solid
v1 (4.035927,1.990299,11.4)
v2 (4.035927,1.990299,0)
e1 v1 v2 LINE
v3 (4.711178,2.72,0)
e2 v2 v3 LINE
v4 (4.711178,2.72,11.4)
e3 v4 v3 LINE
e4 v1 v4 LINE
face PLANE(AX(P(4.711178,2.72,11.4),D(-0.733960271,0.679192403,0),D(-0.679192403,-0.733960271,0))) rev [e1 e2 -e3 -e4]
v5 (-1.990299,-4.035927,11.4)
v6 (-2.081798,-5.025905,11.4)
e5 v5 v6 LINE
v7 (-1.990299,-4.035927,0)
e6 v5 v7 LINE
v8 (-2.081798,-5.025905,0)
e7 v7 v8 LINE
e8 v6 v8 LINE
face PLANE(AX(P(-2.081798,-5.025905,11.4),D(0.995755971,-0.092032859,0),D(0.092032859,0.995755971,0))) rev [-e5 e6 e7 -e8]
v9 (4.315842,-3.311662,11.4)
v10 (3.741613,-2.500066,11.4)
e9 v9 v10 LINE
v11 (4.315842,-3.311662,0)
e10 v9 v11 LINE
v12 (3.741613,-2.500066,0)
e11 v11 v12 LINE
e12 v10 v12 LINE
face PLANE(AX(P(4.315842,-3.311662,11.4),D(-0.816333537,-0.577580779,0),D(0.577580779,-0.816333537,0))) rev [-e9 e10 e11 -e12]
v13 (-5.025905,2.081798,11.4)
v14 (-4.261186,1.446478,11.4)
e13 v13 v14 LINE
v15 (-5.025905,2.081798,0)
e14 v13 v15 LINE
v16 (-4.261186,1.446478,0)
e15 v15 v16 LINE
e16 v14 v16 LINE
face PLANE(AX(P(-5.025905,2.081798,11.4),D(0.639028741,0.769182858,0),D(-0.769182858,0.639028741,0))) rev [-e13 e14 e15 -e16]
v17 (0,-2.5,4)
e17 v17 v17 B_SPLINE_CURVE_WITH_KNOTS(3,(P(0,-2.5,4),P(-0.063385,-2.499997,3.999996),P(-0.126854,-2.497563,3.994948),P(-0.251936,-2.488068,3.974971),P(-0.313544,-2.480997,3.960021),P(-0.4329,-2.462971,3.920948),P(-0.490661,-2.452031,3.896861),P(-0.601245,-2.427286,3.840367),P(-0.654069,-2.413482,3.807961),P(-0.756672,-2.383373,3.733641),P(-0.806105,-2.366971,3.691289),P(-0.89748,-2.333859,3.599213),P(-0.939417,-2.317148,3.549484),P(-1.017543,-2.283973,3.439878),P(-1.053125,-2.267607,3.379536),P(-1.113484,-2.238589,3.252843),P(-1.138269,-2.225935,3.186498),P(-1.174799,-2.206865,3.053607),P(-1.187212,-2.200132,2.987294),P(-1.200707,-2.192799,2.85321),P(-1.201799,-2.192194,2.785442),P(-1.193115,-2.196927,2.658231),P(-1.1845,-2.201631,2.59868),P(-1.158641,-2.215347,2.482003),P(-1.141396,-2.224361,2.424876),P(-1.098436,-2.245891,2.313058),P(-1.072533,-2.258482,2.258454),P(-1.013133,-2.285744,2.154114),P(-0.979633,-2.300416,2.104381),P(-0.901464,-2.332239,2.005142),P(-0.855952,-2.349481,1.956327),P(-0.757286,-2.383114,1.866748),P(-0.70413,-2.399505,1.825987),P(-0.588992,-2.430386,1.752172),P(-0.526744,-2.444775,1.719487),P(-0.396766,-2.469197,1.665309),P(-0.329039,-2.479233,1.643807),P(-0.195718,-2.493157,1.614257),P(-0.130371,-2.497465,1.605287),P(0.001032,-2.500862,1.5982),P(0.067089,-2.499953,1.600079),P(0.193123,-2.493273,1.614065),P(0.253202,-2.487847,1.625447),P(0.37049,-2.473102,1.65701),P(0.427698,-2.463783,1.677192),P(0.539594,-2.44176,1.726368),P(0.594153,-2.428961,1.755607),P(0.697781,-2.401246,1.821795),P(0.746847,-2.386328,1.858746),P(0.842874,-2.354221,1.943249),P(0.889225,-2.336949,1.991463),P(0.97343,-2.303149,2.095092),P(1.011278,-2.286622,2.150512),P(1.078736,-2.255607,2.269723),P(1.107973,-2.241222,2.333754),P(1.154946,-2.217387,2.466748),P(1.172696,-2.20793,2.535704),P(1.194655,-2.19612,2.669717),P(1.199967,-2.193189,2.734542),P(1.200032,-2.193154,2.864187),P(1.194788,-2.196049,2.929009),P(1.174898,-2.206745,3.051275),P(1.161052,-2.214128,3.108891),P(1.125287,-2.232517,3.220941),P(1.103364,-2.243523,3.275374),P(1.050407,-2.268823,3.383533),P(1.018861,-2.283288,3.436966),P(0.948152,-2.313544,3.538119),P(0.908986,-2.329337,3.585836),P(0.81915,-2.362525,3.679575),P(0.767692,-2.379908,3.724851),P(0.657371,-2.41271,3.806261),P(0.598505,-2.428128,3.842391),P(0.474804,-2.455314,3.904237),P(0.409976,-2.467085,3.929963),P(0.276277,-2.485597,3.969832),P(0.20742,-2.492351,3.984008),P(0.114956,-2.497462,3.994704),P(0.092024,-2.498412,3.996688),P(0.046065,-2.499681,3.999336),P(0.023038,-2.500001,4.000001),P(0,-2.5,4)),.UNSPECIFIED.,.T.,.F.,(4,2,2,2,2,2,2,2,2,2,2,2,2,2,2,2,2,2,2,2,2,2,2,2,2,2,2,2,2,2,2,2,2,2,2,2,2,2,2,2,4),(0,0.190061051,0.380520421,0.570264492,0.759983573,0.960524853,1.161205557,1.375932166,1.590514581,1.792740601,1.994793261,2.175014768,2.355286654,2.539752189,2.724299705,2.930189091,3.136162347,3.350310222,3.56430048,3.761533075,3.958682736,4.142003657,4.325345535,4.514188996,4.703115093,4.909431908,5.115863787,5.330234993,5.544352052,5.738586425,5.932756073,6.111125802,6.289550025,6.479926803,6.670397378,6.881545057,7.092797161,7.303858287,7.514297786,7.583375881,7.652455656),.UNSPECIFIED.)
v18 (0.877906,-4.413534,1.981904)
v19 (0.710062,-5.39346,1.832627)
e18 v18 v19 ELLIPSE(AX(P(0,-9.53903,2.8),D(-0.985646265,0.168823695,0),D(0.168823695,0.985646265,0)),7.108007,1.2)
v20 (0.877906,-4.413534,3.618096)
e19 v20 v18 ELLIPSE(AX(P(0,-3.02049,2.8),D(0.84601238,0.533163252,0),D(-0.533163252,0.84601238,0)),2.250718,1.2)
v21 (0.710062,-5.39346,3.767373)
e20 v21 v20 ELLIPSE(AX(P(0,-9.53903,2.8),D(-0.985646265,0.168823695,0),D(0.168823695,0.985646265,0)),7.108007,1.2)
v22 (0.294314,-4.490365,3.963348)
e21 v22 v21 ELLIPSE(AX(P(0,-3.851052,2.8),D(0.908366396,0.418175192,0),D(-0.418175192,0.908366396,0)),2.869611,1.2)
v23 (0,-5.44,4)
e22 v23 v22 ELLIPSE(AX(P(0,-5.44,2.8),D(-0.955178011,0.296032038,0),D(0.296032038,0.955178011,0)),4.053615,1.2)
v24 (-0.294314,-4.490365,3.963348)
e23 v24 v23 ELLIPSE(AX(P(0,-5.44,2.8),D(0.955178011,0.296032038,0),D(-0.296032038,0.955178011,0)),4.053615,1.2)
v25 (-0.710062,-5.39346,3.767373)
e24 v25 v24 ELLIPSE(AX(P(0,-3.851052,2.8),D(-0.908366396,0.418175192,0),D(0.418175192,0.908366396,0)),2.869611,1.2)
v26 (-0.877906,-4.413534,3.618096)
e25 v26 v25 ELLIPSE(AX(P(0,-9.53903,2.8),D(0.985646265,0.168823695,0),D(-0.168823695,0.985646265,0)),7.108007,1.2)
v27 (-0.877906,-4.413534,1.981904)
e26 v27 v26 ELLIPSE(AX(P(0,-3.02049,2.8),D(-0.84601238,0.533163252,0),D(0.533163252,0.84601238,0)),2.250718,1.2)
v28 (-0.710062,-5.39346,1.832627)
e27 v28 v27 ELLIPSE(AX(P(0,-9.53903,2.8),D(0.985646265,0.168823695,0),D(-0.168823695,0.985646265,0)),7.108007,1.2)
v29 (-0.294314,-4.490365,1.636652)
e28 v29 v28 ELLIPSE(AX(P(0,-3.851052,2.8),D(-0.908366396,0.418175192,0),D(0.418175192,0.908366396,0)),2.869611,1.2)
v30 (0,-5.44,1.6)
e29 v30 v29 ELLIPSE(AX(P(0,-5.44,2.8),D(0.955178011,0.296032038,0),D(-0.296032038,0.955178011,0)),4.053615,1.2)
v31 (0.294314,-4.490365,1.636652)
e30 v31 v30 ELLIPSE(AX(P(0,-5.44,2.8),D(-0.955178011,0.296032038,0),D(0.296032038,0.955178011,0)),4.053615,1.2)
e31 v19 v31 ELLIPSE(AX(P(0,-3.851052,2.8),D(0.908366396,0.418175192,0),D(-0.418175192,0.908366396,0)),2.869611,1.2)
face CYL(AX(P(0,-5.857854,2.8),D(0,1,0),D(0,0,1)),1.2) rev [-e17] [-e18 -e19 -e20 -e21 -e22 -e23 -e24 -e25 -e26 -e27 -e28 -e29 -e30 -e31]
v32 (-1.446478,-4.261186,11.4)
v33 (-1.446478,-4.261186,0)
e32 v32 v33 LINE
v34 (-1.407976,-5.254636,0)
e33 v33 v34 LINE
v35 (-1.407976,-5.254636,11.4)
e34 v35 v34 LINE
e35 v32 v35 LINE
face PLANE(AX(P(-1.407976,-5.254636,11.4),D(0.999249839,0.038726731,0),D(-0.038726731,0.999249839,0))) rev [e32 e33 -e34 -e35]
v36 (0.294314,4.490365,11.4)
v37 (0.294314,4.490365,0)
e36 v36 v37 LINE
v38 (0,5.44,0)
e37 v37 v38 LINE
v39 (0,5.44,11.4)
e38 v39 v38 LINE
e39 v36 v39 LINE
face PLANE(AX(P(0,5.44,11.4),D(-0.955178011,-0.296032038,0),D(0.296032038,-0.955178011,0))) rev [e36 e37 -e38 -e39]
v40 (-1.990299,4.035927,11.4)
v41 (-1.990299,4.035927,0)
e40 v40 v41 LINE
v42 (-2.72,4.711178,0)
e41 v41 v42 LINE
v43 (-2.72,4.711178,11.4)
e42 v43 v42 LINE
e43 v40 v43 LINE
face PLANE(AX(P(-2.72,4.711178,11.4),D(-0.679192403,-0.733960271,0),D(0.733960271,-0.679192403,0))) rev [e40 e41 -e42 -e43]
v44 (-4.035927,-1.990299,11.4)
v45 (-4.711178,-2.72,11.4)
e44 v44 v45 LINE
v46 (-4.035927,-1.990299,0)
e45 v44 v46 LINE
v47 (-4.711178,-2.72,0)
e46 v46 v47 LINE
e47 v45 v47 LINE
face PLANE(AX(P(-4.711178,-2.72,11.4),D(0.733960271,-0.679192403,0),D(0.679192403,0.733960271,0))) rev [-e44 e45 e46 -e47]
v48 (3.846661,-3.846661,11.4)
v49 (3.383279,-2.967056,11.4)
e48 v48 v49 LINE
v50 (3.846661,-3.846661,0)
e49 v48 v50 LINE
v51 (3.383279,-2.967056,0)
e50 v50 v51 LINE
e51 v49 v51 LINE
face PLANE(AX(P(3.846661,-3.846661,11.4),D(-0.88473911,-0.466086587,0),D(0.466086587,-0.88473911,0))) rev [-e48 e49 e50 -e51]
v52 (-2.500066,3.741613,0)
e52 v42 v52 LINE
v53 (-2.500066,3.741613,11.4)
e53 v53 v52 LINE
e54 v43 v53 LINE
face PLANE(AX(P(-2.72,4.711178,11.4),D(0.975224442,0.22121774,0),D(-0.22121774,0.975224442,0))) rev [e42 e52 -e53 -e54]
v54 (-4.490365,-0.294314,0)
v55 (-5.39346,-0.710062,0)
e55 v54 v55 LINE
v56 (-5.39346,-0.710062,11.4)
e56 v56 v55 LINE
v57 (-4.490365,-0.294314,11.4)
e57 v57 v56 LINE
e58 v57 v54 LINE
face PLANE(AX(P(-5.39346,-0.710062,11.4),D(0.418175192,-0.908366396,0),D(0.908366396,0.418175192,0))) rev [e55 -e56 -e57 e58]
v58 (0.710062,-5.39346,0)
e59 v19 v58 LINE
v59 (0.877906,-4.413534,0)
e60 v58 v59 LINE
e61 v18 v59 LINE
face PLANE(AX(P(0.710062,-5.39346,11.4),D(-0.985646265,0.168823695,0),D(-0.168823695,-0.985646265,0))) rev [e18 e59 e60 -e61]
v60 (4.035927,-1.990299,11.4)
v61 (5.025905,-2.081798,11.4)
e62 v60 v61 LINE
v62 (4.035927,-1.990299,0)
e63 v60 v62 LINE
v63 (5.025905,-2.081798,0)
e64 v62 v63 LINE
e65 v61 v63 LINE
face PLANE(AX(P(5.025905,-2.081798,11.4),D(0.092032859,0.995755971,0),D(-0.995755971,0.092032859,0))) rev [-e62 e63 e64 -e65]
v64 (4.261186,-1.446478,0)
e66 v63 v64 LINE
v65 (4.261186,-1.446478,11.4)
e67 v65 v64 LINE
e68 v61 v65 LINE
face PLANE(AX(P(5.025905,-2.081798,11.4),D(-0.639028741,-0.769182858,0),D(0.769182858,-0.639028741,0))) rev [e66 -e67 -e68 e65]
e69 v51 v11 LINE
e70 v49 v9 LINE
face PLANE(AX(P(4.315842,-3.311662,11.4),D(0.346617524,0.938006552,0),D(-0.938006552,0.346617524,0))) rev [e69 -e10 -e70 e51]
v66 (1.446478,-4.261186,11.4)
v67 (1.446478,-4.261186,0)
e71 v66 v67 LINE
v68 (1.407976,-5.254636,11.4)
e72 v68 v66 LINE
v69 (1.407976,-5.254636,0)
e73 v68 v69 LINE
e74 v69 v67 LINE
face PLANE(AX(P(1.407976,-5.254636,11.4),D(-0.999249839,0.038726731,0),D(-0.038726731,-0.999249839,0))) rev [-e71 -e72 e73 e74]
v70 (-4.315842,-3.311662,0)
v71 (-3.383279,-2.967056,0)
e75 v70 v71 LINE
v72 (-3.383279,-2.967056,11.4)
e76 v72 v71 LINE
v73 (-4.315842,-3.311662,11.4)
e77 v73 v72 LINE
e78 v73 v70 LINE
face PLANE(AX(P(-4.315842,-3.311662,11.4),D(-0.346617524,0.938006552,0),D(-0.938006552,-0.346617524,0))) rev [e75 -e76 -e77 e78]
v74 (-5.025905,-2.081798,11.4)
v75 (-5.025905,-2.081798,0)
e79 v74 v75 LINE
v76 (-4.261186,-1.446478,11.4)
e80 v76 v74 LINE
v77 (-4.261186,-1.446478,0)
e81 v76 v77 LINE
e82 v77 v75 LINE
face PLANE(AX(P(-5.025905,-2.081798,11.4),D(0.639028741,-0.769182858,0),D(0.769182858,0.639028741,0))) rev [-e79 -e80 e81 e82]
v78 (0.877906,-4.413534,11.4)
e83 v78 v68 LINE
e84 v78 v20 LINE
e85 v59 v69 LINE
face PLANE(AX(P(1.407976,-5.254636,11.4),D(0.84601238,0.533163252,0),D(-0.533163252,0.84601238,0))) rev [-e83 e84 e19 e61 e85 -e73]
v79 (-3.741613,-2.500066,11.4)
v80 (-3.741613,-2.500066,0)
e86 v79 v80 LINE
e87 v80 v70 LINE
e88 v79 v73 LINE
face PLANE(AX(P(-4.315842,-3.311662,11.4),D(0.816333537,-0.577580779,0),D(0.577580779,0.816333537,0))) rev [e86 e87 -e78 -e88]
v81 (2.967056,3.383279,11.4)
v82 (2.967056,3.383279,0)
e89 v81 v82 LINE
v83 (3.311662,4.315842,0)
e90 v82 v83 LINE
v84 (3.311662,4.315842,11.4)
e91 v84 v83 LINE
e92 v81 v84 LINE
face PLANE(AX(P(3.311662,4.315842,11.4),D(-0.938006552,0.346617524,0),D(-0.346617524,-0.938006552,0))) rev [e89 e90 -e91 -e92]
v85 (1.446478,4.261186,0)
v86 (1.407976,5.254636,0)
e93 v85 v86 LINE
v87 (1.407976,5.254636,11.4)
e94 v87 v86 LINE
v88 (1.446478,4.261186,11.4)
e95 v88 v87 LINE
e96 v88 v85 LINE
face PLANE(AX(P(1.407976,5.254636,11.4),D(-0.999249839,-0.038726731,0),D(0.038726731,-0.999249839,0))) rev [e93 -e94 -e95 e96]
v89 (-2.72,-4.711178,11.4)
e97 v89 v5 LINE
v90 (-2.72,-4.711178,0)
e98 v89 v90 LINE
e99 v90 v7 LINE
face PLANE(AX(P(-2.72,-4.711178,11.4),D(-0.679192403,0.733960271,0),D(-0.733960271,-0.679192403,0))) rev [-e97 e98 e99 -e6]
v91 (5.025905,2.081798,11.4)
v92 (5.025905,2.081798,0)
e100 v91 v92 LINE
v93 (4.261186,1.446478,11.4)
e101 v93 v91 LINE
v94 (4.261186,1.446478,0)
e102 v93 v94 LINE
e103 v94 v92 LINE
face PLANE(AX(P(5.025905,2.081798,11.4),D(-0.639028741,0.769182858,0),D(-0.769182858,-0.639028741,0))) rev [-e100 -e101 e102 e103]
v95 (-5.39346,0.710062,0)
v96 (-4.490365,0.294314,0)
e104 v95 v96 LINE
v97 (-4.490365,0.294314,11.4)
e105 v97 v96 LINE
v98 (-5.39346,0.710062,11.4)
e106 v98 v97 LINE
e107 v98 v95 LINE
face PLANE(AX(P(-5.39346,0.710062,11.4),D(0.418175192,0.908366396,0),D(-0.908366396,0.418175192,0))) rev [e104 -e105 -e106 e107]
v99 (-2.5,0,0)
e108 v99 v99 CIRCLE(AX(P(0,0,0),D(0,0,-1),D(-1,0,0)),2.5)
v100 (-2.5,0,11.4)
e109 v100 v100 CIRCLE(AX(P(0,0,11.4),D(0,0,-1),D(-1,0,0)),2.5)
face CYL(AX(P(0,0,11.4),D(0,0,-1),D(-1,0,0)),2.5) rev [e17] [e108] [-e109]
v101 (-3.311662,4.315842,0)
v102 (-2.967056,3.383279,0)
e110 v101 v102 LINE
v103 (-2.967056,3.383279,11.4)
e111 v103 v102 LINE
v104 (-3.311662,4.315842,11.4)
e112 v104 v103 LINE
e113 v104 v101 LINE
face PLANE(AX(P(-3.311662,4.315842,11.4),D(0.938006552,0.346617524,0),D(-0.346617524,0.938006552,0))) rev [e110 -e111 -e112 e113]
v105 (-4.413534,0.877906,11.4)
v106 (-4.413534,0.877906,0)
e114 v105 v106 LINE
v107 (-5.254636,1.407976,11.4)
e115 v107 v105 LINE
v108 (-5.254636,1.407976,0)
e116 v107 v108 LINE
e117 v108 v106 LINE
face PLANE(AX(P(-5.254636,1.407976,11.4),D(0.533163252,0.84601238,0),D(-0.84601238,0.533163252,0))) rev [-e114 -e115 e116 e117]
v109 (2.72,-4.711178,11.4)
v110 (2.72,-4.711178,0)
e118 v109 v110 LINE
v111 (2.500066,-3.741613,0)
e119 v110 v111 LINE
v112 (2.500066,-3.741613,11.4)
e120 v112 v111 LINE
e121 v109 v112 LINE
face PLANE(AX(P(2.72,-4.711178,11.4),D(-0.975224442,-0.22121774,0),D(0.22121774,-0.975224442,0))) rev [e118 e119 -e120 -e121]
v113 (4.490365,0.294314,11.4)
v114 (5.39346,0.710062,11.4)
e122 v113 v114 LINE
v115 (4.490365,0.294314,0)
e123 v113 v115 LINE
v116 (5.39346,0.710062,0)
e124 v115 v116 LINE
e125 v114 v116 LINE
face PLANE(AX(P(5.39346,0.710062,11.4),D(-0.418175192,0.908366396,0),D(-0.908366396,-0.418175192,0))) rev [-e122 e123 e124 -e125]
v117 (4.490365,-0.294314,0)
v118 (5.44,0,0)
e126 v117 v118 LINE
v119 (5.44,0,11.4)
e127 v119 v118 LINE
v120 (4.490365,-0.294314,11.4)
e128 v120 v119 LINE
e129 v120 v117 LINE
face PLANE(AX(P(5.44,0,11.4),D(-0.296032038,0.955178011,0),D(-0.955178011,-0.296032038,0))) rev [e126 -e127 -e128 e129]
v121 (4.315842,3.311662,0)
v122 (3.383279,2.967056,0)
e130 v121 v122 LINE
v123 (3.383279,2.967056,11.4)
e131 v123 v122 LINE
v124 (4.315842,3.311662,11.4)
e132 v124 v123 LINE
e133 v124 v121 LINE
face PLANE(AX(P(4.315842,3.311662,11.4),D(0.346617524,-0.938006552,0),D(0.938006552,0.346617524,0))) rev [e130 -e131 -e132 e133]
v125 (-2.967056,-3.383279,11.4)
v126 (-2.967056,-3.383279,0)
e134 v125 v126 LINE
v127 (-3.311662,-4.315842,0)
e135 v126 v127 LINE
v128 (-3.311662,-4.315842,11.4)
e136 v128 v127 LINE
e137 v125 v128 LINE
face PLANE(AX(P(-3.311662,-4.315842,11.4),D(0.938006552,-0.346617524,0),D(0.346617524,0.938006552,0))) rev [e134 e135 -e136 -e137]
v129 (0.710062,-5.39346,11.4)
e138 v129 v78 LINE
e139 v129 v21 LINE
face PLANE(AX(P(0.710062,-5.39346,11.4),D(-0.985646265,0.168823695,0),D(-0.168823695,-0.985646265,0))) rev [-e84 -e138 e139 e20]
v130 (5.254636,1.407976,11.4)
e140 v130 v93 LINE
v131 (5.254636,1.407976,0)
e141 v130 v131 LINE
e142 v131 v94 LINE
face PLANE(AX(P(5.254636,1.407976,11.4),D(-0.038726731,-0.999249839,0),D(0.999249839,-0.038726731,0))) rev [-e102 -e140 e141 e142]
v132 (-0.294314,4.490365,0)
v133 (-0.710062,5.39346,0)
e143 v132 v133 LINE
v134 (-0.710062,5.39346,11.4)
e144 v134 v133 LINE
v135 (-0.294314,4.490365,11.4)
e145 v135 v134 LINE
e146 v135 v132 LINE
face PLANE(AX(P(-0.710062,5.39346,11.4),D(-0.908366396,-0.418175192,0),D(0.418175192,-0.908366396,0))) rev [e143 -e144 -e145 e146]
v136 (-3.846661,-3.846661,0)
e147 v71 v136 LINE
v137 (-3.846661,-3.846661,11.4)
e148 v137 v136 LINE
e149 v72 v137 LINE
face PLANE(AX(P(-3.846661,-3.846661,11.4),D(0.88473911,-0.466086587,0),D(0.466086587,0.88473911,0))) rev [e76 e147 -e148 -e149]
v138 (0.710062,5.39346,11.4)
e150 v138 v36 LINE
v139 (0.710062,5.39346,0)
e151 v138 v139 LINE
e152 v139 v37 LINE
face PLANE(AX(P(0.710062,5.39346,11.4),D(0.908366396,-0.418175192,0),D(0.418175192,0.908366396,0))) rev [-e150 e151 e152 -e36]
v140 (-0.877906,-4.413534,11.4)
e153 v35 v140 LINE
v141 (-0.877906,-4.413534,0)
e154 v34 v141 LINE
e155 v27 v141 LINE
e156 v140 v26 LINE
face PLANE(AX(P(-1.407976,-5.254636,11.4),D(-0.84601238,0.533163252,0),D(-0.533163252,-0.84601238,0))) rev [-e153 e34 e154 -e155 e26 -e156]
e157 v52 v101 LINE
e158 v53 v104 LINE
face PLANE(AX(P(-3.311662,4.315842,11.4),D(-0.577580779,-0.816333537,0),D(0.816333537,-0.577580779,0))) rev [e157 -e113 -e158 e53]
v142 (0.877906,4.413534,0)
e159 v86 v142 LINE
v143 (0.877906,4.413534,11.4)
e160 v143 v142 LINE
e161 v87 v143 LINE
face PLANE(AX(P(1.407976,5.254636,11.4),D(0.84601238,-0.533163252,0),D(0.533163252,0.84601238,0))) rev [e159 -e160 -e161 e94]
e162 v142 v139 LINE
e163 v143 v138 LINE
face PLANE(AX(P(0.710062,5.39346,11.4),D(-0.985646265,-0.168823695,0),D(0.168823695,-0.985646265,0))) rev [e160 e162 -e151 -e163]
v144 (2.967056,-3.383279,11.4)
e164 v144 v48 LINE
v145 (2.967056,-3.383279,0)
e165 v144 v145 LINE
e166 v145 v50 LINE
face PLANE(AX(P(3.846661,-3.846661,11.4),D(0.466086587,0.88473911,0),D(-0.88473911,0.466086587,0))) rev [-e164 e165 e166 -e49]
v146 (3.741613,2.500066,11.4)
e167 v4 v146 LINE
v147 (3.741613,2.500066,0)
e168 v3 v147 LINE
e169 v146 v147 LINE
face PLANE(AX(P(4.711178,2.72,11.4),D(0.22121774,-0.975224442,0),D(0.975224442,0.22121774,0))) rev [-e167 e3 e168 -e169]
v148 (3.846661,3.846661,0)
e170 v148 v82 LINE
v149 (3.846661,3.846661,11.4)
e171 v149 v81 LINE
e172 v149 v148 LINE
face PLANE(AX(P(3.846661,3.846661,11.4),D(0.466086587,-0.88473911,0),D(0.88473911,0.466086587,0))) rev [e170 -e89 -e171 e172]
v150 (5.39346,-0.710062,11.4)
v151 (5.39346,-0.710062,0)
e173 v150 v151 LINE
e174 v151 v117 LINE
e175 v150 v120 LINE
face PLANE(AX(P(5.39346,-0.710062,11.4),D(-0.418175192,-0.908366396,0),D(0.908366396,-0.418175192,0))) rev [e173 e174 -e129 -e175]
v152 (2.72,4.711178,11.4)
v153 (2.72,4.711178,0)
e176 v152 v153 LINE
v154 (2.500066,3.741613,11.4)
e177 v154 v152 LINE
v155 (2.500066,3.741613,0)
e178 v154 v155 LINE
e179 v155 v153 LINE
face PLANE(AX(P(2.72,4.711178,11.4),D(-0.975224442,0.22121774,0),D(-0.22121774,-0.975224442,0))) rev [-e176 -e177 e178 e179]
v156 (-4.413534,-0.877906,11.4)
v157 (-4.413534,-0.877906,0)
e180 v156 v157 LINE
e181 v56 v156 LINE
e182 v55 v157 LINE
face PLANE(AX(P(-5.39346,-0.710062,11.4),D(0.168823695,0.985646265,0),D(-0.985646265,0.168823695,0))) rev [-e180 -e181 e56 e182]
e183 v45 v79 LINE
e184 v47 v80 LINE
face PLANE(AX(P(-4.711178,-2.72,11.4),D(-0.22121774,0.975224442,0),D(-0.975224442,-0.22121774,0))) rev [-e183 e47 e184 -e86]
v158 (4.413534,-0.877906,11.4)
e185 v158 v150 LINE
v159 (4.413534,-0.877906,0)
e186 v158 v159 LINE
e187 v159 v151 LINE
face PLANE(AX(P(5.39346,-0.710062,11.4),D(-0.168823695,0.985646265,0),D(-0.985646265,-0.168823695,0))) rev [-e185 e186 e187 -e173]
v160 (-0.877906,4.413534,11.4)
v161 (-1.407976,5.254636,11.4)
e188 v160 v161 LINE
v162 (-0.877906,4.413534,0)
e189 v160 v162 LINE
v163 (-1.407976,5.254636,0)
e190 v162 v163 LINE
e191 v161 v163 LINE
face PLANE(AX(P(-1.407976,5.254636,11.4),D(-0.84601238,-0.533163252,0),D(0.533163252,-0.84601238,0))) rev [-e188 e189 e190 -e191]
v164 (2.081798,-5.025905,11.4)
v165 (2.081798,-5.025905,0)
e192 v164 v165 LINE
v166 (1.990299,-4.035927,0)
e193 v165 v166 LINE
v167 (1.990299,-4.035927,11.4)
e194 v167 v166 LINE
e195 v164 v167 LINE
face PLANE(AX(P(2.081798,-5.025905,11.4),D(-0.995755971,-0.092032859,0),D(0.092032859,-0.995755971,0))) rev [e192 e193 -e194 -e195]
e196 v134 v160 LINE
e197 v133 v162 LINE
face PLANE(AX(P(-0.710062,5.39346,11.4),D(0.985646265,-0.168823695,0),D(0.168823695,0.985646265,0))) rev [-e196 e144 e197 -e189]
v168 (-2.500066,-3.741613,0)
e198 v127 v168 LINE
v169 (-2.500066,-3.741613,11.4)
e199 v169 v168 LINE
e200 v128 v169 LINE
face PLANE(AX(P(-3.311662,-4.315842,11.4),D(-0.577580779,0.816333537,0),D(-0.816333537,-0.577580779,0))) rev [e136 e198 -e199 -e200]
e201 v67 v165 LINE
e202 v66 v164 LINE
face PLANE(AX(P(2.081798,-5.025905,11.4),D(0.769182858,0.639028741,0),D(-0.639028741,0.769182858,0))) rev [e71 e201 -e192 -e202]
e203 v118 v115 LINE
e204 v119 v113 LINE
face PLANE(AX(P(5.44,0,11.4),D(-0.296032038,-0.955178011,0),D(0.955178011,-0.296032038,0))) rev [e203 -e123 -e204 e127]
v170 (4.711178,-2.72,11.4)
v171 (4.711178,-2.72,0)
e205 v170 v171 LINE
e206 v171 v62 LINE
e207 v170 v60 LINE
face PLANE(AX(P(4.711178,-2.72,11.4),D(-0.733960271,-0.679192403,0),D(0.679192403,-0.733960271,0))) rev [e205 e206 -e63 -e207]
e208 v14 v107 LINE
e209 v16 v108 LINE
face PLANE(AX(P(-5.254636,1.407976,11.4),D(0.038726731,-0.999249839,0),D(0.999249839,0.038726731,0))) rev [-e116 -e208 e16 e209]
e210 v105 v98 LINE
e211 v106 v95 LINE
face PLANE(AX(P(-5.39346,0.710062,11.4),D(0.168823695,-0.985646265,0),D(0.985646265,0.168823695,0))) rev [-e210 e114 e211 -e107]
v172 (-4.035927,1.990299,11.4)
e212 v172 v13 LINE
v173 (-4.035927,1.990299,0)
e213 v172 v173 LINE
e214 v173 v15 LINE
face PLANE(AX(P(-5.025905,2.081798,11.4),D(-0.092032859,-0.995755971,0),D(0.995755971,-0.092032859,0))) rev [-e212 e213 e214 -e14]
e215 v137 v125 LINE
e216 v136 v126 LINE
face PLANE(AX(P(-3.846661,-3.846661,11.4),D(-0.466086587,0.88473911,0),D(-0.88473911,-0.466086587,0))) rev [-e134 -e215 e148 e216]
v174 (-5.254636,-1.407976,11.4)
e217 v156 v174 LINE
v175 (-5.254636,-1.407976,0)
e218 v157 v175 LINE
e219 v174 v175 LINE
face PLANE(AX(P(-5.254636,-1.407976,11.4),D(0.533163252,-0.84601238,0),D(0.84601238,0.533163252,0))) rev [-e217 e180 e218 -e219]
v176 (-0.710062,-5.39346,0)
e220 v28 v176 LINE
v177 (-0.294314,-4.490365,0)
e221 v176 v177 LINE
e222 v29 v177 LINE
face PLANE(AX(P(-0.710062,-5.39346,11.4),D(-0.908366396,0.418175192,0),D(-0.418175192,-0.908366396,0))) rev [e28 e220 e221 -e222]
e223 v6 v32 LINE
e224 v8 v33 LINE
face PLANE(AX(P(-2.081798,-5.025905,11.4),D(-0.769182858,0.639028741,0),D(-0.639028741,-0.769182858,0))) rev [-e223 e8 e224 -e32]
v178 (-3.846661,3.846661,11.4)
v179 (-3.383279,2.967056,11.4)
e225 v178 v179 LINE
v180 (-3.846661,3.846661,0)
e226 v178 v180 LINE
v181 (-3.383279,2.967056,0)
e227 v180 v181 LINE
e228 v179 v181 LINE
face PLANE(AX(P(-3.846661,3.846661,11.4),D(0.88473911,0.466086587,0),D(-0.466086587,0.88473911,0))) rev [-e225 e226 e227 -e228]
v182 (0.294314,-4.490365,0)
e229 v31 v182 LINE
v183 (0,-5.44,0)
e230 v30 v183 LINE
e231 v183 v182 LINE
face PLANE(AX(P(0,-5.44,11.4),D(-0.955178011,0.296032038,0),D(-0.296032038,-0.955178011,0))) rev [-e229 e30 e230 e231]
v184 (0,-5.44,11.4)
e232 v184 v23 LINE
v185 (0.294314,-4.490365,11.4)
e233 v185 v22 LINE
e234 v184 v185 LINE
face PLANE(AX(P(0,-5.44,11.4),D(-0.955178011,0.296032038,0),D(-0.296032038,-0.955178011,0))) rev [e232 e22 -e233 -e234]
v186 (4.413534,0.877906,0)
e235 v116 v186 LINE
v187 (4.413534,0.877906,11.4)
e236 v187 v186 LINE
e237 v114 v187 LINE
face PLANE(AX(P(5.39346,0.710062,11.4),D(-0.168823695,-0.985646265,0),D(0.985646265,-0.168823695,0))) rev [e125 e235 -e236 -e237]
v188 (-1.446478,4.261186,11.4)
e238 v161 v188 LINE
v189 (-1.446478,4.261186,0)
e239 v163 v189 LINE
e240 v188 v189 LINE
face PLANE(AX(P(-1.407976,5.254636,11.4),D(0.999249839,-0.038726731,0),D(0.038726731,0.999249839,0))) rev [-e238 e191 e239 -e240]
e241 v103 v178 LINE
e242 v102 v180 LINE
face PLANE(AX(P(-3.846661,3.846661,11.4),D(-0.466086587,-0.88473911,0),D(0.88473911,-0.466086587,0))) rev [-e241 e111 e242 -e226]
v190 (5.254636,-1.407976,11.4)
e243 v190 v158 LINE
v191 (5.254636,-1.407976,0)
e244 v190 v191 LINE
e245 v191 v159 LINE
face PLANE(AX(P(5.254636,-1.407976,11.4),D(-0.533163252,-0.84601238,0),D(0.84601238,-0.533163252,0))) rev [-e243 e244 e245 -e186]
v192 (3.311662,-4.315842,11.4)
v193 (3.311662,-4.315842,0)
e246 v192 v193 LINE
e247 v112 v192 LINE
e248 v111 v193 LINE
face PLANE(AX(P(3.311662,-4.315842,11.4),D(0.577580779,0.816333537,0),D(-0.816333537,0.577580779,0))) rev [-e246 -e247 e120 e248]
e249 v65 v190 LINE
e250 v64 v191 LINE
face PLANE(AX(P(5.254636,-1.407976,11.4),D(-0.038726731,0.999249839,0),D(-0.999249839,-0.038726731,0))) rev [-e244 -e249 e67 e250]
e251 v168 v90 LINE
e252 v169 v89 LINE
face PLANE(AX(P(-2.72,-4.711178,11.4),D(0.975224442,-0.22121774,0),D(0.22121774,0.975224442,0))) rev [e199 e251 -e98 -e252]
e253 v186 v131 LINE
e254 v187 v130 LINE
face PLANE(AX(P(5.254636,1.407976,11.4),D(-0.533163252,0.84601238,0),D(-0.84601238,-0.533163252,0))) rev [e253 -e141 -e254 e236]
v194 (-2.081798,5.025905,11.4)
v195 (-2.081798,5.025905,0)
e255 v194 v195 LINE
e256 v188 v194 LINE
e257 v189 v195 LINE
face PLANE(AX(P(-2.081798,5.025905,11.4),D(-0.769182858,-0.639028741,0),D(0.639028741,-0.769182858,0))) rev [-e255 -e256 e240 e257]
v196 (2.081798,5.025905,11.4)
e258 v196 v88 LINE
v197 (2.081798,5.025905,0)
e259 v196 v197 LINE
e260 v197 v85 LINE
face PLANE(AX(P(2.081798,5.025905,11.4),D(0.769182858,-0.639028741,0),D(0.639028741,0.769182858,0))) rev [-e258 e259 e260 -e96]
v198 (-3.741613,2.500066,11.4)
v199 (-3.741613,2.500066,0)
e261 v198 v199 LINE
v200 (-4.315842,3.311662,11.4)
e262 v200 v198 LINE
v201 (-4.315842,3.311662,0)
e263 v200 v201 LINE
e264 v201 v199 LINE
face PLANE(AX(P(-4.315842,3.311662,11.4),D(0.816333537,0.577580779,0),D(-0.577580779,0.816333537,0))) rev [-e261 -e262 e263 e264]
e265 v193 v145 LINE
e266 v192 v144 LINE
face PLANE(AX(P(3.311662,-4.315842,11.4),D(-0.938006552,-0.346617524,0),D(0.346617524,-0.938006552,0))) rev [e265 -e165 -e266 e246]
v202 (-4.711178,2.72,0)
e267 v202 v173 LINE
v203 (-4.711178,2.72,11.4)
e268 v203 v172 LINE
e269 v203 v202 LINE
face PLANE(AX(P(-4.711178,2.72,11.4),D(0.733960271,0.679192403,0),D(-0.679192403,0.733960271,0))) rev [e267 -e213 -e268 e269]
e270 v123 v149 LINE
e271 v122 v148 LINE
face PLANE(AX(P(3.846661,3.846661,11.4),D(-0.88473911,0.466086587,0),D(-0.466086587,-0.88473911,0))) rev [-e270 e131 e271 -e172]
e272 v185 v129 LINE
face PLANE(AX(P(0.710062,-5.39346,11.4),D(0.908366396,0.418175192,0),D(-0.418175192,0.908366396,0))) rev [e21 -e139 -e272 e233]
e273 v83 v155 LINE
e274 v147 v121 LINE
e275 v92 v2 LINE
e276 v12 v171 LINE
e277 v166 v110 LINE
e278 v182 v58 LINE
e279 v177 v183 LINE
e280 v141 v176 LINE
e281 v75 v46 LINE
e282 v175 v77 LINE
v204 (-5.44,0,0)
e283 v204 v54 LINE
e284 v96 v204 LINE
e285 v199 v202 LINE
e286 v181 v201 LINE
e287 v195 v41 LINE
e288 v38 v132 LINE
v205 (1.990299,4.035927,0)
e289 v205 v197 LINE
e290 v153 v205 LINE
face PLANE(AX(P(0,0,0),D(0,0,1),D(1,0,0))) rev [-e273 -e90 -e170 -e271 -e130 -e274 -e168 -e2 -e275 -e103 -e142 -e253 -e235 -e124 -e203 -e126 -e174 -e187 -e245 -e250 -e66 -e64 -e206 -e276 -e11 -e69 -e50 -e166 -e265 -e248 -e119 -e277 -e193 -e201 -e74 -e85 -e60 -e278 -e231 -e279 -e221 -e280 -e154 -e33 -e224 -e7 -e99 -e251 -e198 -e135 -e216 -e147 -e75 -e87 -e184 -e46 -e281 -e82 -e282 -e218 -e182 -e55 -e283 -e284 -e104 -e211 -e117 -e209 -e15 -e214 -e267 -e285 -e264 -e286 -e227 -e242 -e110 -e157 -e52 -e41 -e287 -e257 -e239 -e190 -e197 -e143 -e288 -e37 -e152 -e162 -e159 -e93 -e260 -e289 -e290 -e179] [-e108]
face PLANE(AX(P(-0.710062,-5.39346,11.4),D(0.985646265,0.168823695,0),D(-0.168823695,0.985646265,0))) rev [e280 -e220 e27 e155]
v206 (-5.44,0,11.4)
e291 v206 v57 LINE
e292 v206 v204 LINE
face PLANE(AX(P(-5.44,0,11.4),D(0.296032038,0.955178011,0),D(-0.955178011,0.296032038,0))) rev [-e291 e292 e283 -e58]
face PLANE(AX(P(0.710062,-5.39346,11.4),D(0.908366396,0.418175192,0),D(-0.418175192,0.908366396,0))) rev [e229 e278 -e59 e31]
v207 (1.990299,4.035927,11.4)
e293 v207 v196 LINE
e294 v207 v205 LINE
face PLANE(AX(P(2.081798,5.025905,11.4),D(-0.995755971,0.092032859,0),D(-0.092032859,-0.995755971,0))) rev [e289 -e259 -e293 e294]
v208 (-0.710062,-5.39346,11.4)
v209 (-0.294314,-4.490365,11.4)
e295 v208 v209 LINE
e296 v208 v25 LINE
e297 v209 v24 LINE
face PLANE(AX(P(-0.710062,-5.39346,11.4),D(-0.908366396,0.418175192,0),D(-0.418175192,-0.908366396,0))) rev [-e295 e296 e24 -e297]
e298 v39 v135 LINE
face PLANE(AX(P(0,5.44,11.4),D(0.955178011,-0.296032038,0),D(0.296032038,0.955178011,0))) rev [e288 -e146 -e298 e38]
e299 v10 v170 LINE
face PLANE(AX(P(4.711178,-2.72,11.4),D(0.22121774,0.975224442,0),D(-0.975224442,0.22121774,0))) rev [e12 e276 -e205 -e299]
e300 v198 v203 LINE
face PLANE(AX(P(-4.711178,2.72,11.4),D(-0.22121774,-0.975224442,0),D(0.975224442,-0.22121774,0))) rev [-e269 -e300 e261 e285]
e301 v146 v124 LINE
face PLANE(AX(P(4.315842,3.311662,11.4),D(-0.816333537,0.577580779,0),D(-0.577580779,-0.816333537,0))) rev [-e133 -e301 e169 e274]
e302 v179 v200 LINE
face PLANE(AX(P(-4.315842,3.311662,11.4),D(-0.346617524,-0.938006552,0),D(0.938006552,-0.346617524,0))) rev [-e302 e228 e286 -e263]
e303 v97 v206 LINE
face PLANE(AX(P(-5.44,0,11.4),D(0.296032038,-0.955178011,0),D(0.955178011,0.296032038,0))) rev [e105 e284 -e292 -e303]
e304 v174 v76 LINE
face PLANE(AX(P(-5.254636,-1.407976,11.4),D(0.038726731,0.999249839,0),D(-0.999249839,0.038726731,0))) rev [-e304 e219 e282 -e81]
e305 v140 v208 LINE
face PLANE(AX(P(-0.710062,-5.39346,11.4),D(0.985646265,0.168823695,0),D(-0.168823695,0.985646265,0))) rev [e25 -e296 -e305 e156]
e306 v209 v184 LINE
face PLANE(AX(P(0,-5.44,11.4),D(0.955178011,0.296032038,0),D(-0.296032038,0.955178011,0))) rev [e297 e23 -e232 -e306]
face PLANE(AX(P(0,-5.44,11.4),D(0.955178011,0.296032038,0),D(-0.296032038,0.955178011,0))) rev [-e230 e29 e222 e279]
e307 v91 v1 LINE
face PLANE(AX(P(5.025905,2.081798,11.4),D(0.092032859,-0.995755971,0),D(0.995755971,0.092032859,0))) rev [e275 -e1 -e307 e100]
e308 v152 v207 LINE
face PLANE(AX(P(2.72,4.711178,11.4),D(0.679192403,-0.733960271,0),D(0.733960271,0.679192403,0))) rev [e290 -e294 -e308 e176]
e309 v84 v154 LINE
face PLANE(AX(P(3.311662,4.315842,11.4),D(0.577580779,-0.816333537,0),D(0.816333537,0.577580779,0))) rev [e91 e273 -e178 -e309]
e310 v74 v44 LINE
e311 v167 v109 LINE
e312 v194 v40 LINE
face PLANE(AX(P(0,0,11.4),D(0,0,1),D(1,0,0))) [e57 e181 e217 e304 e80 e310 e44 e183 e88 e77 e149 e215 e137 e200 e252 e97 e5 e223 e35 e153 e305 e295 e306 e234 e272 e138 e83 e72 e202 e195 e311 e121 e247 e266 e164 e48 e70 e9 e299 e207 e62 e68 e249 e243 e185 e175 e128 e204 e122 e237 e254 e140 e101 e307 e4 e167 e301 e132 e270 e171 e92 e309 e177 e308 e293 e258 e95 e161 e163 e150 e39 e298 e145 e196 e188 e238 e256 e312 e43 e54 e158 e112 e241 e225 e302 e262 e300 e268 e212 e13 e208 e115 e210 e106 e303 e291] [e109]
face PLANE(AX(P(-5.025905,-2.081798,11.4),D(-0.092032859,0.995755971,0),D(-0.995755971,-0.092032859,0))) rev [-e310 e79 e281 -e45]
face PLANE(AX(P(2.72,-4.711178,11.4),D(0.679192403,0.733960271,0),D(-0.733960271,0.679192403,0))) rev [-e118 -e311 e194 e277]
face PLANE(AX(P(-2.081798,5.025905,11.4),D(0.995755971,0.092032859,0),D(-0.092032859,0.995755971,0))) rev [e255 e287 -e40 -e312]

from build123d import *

# Parameters (mm, degrees)
EXTRUDE_1_DEPTH   = 11.4
OTHER_1_OUTLINE_R = 2.5
OTHER_1_DEPTH     = 11.4
SKETCH_9_R        = 1.2


# Read off the part's stored shape, not the designer's step: 孔1
with BuildPart() as part:
    # 草图6 → 凸台-拉伸1 (new body)
    with BuildSketch(Plane.XY):
        Polygon((5.393460046, -0.710062486), (4.490365155, -0.294314082), (5.44, 0), (4.490365155, 0.294314082), (5.393460046, 0.710062486), (4.413533762, 0.877906449), (5.254636495, 1.407975605), (4.261185583, 1.446477594), (5.025904657, 2.081797872), (4.035927337, 1.990299106), (4.711178197, 2.72), (3.741613255, 2.500066049), (4.315842171, 3.311662174), (3.383279134, 2.967056168), (3.84666089, 3.84666089), (2.967056168, 3.383279134), (3.311662174, 4.315842171), (2.500066049, 3.741613255), (2.72, 4.711178197), (1.990299106, 4.035927337), (2.081797872, 5.025904657), (1.446477594, 4.261185583), (1.407975605, 5.254636495), (0.877906449, 4.413533762), (0.710062486, 5.393460046), (0.294314082, 4.490365155), (0, 5.44), (-0.294314082, 4.490365155), (-0.710062486, 5.393460046), (-0.877906449, 4.413533762), (-1.407975605, 5.254636495), (-1.446477594, 4.261185583), (-2.081797872, 5.025904657), (-1.990299106, 4.035927337), (-2.72, 4.711178197), (-2.500066049, 3.741613255), (-3.311662174, 4.315842171), (-2.967056168, 3.383279134), (-3.84666089, 3.84666089), (-3.383279134, 2.967056168), (-4.315842171, 3.311662174), (-3.741613255, 2.500066049), (-4.711178197, 2.72), (-4.035927337, 1.990299106), (-5.025904657, 2.081797872), (-4.261185583, 1.446477594), (-5.254636495, 1.407975605), (-4.413533762, 0.877906449), (-5.393460046, 0.710062486), (-4.490365155, 0.294314082), (-5.44, 0), (-4.490365155, -0.294314082), (-5.393460046, -0.710062486), (-4.413533762, -0.877906449), (-5.254636495, -1.407975605), (-4.261185583, -1.446477594), (-5.025904657, -2.081797872), (-4.035927337, -1.990299106), (-4.711178197, -2.72), (-3.741613255, -2.500066049), (-4.315842171, -3.311662174), (-3.383279134, -2.967056168), (-3.84666089, -3.84666089), (-2.967056168, -3.383279134), (-3.311662174, -4.315842171), (-2.500066049, -3.741613255), (-2.72, -4.711178197), (-1.990299106, -4.035927337), (-2.081797872, -5.025904657), (-1.446477594, -4.261185583), (-1.407975605, -5.254636495), (-0.877906449, -4.413533762), (-0.710062486, -5.393460046), (-0.294314082, -4.490365155), (0, -5.44), (0.294314082, -4.490365155), (0.710062486, -5.393460046), (0.877906449, -4.413533762), (1.407975605, -5.254636495), (1.446477594, -4.261185583), (2.081797872, -5.025904657), (1.990299106, -4.035927337), (2.72, -4.711178197), (2.500066049, -3.741613255), (3.311662174, -4.315842171), (2.967056168, -3.383279134), (3.84666089, -3.84666089), (3.383279134, -2.967056168), (4.315842171, -3.311662174), (3.741613255, -2.500066049), (4.711178197, -2.72), (4.035927337, -1.990299106), (5.025904657, -2.081797872), (4.261185583, -1.446477594), (5.254636495, -1.407975605), (4.413533762, -0.877906449), align=None)
    extrude(amount=EXTRUDE_1_DEPTH)

    # 孔1 outline → 孔1 (cut)
    with BuildSketch(Plane.XY):
        Circle(OTHER_1_OUTLINE_R)
    extrude(amount=OTHER_1_DEPTH, mode=Mode.SUBTRACT)

    # 切除-扫描1: sweep along a path in 草图10
    with BuildLine(Plane(origin=(0, 0, 0), x_dir=(0, 0, -1), z_dir=(1, 0, 0))) as sweep_1_path:
        Line((-2.8, 0), (-2.8, -5.857853696))
    # 草图9 → 切除-扫描1 (sweep, cut)
    with BuildSketch(Plane(origin=(0, 0, 0), x_dir=(1, 0, 0), z_dir=(0, 1, 0))):
        with Locations((0, -2.8)):
            Circle(SKETCH_9_R)
    sweep(path=sweep_1_path.line, mode=Mode.SUBTRACT)


solid = part.part
